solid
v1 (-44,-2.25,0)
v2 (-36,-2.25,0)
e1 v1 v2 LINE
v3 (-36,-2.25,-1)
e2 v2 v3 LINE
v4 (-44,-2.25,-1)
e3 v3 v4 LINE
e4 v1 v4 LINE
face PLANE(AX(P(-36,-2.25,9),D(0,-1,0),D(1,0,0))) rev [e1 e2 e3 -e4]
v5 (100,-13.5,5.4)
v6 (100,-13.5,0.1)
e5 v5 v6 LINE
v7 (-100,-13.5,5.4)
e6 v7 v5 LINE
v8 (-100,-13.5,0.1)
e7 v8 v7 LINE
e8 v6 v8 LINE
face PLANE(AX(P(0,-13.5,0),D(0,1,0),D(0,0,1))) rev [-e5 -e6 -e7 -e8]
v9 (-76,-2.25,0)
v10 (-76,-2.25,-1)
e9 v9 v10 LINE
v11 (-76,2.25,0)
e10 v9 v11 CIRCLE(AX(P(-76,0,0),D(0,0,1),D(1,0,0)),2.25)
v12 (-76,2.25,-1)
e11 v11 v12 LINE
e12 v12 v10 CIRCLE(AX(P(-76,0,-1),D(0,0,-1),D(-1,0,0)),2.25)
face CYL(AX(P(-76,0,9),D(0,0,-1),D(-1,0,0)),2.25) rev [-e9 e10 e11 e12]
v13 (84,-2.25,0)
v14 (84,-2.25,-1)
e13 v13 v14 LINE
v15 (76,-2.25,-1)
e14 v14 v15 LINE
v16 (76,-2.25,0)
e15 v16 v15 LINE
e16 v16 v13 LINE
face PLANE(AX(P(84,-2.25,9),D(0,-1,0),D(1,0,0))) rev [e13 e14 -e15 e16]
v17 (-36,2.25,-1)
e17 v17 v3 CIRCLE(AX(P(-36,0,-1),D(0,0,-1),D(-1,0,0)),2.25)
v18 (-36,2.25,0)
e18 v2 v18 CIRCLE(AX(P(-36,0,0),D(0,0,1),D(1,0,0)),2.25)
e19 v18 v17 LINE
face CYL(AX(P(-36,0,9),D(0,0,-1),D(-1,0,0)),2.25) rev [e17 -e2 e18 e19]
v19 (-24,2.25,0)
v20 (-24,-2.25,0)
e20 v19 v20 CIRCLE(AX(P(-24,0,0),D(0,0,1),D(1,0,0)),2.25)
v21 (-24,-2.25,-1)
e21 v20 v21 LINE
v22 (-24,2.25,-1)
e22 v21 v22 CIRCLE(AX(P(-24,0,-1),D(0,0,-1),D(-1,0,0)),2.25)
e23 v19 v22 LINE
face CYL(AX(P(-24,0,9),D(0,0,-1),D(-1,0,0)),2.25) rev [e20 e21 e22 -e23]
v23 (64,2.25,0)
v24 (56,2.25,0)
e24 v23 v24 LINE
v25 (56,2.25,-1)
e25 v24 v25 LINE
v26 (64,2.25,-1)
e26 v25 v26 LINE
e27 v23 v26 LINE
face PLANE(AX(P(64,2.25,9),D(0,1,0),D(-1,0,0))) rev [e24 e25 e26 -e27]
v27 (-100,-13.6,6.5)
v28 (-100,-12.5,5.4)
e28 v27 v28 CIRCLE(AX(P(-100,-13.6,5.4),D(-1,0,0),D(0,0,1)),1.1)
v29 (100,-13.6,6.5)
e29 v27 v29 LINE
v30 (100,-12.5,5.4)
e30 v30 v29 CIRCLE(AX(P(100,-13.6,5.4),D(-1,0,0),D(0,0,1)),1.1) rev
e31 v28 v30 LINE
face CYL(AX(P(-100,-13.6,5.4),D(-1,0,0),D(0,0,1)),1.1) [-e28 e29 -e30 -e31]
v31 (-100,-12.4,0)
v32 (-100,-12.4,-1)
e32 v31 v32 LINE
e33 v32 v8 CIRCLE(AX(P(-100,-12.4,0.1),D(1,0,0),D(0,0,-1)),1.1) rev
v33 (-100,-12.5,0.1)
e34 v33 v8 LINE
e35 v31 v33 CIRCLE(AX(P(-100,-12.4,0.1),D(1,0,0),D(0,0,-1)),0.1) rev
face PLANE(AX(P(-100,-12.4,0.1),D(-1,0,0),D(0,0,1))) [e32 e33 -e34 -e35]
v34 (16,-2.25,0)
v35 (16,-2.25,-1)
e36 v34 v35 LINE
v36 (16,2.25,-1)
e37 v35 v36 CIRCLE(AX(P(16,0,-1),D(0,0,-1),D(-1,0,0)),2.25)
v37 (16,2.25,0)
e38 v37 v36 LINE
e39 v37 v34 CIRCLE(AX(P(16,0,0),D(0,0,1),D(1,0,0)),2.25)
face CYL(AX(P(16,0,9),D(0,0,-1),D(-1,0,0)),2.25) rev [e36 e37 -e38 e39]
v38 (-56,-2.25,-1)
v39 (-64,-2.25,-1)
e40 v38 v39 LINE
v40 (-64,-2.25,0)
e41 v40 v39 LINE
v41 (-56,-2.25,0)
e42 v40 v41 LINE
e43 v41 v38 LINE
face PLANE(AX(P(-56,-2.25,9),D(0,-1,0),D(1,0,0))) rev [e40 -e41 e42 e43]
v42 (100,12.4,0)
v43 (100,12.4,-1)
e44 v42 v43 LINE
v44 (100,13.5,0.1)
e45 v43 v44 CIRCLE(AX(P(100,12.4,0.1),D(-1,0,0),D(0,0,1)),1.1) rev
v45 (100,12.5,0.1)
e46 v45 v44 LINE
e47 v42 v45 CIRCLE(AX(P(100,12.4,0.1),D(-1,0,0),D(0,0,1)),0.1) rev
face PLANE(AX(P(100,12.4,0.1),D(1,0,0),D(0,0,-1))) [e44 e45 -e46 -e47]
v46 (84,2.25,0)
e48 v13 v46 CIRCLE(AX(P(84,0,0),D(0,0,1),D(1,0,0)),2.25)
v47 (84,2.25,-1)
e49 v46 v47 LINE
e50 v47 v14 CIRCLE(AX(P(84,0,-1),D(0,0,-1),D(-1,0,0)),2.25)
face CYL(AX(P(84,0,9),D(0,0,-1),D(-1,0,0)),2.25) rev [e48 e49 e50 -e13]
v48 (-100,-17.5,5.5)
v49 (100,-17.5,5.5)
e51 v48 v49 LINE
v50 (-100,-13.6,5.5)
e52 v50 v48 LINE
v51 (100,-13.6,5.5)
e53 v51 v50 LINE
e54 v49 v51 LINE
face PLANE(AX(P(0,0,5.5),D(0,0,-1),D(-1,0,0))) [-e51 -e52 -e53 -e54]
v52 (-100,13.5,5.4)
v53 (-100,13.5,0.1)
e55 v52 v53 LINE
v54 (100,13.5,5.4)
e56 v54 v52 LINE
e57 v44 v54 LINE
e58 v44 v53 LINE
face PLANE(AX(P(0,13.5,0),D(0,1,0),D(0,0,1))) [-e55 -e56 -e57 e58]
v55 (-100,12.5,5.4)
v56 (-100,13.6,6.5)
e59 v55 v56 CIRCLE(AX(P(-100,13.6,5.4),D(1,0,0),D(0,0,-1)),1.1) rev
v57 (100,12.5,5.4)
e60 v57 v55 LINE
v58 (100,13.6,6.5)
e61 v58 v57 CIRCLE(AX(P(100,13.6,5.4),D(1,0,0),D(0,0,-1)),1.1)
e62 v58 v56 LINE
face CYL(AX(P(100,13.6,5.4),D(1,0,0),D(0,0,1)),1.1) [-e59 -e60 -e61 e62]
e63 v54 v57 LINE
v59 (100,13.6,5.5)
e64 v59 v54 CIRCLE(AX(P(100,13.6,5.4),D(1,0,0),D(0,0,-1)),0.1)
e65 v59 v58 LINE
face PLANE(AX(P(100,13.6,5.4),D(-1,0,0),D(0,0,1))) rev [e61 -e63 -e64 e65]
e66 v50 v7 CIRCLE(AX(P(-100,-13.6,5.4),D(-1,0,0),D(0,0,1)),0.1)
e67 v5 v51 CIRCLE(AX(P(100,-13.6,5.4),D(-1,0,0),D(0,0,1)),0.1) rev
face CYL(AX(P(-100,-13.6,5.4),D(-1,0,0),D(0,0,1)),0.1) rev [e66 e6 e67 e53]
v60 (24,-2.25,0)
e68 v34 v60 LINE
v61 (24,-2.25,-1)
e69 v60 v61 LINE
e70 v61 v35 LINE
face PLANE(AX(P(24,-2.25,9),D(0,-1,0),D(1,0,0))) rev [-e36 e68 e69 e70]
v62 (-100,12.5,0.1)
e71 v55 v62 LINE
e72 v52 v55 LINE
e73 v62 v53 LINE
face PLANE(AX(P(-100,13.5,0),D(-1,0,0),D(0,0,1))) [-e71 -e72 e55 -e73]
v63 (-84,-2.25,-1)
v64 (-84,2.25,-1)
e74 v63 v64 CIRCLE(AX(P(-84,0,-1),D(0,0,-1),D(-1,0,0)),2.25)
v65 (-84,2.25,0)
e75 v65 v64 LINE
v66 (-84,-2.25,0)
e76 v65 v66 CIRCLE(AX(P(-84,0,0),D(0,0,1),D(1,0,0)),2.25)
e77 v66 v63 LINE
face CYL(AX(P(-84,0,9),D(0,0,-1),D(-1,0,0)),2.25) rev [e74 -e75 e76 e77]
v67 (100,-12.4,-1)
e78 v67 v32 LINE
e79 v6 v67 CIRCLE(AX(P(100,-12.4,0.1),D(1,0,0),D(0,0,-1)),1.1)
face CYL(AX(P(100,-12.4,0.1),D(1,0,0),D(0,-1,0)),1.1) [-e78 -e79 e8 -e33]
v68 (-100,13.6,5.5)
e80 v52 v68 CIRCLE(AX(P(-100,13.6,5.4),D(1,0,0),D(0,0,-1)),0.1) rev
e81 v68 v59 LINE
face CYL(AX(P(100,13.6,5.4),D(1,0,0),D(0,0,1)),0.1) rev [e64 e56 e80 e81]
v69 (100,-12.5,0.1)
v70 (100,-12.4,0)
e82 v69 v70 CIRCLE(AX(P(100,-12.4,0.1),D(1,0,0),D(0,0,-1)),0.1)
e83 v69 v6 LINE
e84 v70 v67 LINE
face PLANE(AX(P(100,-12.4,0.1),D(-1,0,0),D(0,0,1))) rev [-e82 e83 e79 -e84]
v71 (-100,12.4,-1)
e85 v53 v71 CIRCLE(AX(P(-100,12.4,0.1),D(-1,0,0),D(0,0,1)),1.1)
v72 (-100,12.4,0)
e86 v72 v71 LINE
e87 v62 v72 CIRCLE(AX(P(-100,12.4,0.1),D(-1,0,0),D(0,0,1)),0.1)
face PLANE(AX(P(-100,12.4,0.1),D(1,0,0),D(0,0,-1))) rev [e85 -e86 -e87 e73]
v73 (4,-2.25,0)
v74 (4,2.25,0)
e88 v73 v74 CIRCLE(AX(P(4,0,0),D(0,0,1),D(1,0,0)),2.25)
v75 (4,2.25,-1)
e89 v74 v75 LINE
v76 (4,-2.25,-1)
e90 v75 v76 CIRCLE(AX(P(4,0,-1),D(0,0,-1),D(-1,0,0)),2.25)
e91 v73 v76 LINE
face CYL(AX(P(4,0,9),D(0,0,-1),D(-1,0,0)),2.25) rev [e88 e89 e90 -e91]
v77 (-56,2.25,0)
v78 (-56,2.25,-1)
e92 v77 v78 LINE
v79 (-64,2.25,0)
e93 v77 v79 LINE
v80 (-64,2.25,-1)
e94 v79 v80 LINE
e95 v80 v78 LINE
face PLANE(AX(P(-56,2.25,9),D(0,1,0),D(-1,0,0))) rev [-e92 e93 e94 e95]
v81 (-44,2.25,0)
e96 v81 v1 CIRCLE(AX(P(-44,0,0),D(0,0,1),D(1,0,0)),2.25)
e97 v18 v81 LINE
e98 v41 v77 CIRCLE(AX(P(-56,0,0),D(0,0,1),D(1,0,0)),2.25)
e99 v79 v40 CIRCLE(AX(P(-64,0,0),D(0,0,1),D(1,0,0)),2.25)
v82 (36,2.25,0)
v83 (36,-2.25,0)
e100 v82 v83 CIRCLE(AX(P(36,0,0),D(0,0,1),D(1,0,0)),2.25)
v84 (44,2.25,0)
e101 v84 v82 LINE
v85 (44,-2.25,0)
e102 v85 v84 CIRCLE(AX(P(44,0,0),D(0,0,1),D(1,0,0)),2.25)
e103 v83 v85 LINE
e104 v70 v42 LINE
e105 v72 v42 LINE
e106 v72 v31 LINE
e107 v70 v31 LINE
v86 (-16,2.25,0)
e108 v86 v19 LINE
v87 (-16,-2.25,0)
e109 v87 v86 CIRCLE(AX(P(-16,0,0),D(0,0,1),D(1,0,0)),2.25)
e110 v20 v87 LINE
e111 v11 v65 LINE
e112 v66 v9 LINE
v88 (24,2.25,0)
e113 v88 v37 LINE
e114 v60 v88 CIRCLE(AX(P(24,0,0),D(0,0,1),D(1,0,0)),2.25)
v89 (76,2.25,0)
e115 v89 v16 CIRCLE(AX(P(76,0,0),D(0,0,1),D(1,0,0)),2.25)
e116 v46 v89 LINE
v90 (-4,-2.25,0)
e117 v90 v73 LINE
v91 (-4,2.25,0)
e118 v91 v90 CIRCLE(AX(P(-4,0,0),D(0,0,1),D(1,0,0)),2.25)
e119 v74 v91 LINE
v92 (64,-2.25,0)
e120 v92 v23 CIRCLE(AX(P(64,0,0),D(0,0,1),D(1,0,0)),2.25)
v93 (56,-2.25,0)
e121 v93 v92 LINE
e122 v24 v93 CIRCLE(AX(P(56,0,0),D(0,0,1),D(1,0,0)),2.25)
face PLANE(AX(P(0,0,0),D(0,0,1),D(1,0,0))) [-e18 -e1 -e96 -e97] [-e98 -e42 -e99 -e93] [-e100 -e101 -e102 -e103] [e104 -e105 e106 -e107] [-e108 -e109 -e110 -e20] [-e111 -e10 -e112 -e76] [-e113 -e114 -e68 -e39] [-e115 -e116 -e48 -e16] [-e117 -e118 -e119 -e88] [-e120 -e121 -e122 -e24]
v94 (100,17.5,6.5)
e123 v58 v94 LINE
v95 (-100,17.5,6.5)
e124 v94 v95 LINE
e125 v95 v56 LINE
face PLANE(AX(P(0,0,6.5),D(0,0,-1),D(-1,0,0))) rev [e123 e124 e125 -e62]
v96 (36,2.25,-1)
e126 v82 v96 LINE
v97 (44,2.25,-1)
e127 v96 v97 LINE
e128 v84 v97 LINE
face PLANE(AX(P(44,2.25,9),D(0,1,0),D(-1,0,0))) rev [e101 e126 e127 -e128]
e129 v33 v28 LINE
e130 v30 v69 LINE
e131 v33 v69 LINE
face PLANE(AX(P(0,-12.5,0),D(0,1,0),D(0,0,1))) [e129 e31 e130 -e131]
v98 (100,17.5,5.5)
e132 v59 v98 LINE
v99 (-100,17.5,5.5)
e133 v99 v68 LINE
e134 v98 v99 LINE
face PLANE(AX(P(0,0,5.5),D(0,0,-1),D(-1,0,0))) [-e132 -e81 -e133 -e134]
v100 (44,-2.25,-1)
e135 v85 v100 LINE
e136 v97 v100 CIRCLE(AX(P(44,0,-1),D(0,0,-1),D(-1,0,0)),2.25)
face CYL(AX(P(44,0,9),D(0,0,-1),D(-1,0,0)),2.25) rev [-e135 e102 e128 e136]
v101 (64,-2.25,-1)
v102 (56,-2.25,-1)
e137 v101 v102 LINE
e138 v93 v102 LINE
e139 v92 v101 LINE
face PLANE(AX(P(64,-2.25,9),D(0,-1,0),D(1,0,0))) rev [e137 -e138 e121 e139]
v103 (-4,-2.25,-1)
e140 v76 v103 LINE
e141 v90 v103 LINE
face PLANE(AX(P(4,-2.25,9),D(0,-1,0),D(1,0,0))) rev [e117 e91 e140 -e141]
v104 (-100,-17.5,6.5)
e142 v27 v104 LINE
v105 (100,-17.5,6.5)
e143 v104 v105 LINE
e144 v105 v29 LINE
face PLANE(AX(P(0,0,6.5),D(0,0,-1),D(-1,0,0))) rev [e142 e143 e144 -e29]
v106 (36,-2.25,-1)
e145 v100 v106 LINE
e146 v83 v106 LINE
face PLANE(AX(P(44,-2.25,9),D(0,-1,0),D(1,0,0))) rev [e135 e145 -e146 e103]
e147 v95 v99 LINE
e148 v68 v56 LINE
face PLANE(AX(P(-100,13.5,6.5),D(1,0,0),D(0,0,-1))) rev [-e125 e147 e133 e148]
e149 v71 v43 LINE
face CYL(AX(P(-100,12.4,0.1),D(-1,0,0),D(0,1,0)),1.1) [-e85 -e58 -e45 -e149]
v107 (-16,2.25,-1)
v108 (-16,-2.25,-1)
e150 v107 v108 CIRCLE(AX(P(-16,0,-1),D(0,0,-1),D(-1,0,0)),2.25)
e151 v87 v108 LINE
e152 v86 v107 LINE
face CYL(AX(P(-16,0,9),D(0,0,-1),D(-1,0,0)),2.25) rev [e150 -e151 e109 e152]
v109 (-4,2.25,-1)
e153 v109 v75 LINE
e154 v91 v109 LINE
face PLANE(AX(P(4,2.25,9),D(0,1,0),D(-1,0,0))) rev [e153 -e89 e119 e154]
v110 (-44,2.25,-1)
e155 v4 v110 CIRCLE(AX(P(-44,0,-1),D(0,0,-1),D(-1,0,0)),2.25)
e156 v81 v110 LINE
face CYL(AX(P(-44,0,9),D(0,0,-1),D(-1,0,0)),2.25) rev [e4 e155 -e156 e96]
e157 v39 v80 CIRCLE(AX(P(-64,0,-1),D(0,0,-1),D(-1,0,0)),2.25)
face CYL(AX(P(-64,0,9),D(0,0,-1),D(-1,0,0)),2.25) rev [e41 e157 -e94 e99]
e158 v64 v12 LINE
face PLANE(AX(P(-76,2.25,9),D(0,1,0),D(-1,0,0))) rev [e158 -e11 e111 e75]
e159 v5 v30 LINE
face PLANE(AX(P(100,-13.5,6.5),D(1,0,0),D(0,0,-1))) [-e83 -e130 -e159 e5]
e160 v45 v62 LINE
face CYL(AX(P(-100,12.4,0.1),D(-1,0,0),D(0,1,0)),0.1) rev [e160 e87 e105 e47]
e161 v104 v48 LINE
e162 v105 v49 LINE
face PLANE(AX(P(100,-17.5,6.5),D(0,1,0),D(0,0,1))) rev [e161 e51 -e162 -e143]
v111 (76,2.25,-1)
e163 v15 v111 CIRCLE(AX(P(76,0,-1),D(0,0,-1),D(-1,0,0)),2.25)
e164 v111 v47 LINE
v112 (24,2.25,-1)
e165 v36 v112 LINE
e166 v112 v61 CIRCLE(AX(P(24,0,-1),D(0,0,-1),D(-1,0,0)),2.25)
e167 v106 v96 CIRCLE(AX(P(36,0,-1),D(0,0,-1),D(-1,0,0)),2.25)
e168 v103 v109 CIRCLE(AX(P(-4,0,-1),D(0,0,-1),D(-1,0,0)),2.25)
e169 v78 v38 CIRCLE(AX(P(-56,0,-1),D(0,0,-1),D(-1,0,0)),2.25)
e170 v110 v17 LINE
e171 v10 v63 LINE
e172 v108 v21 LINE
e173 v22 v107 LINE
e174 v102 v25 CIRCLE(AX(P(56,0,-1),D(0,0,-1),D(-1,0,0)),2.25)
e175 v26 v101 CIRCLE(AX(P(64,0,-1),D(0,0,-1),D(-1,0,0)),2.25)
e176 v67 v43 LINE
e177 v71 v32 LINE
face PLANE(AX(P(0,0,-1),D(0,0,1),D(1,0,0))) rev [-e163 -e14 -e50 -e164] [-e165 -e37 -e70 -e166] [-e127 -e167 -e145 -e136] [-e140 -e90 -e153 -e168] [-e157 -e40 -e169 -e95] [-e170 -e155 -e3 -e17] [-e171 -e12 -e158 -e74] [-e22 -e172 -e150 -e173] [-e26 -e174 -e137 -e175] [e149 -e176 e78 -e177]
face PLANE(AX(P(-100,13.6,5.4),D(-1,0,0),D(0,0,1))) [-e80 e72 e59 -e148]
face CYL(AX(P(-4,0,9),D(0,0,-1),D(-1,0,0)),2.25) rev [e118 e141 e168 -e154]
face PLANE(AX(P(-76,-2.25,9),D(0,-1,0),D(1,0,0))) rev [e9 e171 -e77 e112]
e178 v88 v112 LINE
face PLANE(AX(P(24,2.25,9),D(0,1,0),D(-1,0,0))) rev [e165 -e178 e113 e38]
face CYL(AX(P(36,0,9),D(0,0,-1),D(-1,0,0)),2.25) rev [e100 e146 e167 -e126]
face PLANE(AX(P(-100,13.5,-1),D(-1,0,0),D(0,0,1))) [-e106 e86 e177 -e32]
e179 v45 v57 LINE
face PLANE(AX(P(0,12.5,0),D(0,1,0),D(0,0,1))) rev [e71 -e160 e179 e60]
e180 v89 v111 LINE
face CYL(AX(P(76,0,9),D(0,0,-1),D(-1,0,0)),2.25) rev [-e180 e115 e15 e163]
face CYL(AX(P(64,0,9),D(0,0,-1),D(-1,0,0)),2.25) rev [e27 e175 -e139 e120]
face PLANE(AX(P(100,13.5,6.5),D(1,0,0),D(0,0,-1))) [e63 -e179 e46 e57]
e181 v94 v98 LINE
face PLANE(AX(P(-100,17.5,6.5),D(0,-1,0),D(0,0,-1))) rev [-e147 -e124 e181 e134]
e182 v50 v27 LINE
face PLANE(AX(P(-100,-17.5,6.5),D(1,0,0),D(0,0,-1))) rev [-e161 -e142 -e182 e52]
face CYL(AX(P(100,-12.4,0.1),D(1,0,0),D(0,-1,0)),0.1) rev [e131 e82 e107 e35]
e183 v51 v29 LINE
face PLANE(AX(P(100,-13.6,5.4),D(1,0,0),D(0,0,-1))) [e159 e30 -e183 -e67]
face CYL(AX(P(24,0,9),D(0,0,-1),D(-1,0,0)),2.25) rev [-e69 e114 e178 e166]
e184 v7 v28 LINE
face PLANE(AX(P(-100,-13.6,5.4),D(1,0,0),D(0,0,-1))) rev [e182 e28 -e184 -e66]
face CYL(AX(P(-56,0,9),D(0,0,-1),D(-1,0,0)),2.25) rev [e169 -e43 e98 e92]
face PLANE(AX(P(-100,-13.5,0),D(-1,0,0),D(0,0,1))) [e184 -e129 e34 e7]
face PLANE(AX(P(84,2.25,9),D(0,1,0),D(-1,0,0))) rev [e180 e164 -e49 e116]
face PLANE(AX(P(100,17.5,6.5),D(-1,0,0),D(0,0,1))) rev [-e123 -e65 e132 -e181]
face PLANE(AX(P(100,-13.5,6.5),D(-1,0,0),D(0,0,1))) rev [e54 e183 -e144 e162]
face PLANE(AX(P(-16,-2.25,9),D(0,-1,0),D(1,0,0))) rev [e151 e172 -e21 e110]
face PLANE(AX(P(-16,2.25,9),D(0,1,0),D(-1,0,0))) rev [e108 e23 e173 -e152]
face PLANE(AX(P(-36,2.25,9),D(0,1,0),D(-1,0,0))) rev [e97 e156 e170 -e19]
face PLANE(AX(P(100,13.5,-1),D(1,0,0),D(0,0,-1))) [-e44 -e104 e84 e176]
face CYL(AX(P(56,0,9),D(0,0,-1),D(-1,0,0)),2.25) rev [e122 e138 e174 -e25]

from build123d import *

# Parameters (mm, degrees)
SKETCH_1_W                         = 200
SKETCH_1_H                         = 27
SM_BASE_FLANGE_1_DEPTH             = 1
SM_EDGE_FLANGE_1_STRIP_W           = 4.2
SM_EDGE_FLANGE_1_STRIP_H           = 1
SM_EDGE_FLANGE_1_STRIP_CUT_DEPTH   = 200
SM_EDGE_FLANGE_1_STRIP_2_W         = 4.2
SM_EDGE_FLANGE_1_STRIP_2_H         = 1
SM_EDGE_FLANGE_1_STRIP_CUT_2_DEPTH = 200
SM_EDGE_FLANGE_1_DEPTH             = 200
SM_EDGE_FLANGE_1_BEND_DEPTH        = 200
SM_EDGE_FLANGE_2_STRIP_W           = 4.2
SM_EDGE_FLANGE_2_STRIP_H           = 1
SM_EDGE_FLANGE_2_STRIP_CUT_DEPTH   = 200
SM_EDGE_FLANGE_2_STRIP_2_W         = 4.2
SM_EDGE_FLANGE_2_STRIP_2_H         = 1
SM_EDGE_FLANGE_2_STRIP_CUT_2_DEPTH = 200
SM_EDGE_FLANGE_2_DEPTH             = 200
SM_EDGE_FLANGE_2_BEND_DEPTH        = 200
CUT_EXTRUDE_1_DEPTH                = 10
PATTERN_LINEAR_1_COUNT             = 5
PATTERN_LINEAR_1_PITCH             = 20
PATTERN_LINEAR_1_COL_COUNT         = 5
PATTERN_LINEAR_1_COL_PITCH         = 20


# Sheet-metal steps are written as plain solids
with BuildPart() as part:
    # Sketch 1 → 基体-法兰1 (new body)
    with BuildSketch(Plane.XY):
        Rectangle(SKETCH_1_W, SKETCH_1_H)
    extrude(amount=-SM_BASE_FLANGE_1_DEPTH)

    # 边线-法兰1 strip (across the edge) → 边线-法兰1 strip cut (cut)
    with BuildSketch(Plane(origin=(100, 13.5, 0), x_dir=(0, -1, 0), z_dir=(-1, 0, 0))):
        with Locations((-1, -0.5)):
            Rectangle(SM_EDGE_FLANGE_1_STRIP_W, SM_EDGE_FLANGE_1_STRIP_H)
    extrude(amount=SM_EDGE_FLANGE_1_STRIP_CUT_DEPTH, mode=Mode.SUBTRACT)

    # 边线-法兰1 strip 2 (across the edge) → 边线-法兰1 strip cut 2 (cut)
    with BuildSketch(Plane(origin=(-100, -13.5, 0), x_dir=(0, 1, 0), z_dir=(1, 0, 0))):
        with Locations((-1, -0.5)):
            Rectangle(SM_EDGE_FLANGE_1_STRIP_2_W, SM_EDGE_FLANGE_1_STRIP_2_H)
    extrude(amount=SM_EDGE_FLANGE_1_STRIP_CUT_2_DEPTH, mode=Mode.SUBTRACT)

    # 边线-法兰1 section (across the edge) → 边线-法兰1 (add)
    with BuildSketch(Plane(origin=(100, 13.5, 0), x_dir=(0, -1, 0), z_dir=(-1, 0, 0))):
        with BuildLine():
            Line((0, 0.1), (0, 6.5))
            Line((0, 6.5), (1, 6.5))
            Line((1, 6.5), (1, 0.1))
            ThreePointArc((1, 0.1), (1.029289322, 0.029289322), (1.1, 0))
            Line((1.1, 0), (1.1, -1))
            ThreePointArc((1.1, -1), (0.322182541, -0.677817459), (0, 0.1))
        make_face()
    extrude(amount=SM_EDGE_FLANGE_1_DEPTH)

    # 边线-法兰1 section 2 (across the edge) → 边线-法兰1 bend (add)
    with BuildSketch(Plane(origin=(-100, -13.5, 0), x_dir=(0, 1, 0), z_dir=(1, 0, 0))):
        with BuildLine():
            Line((0, 0.1), (0, 6.5))
            Line((0, 6.5), (1, 6.5))
            Line((1, 6.5), (1, 0.1))
            ThreePointArc((1, 0.1), (1.029289322, 0.029289322), (1.1, 0))
            Line((1.1, 0), (1.1, -1))
            ThreePointArc((1.1, -1), (0.322182541, -0.677817459), (0, 0.1))
        make_face()
    extrude(amount=SM_EDGE_FLANGE_1_BEND_DEPTH)

    # 边线-法兰2 strip (across the edge) → 边线-法兰2 strip cut (cut)
    with BuildSketch(Plane(origin=(-100, 13.5, 6.5), x_dir=(0, 0, -1), z_dir=(1, 0, 0))):
        with Locations((-1, -0.5)):
            Rectangle(SM_EDGE_FLANGE_2_STRIP_W, SM_EDGE_FLANGE_2_STRIP_H)
    extrude(amount=SM_EDGE_FLANGE_2_STRIP_CUT_DEPTH, mode=Mode.SUBTRACT)

    # 边线-法兰2 strip 2 (across the edge) → 边线-法兰2 strip cut 2 (cut)
    with BuildSketch(Plane(origin=(100, -13.5, 6.5), x_dir=(0, 0, -1), z_dir=(-1, 0, 0))):
        with Locations((-1, -0.5)):
            Rectangle(SM_EDGE_FLANGE_2_STRIP_2_W, SM_EDGE_FLANGE_2_STRIP_2_H)
    extrude(amount=SM_EDGE_FLANGE_2_STRIP_CUT_2_DEPTH, mode=Mode.SUBTRACT)

    # 边线-法兰2 section (across the edge) → 边线-法兰2 (add)
    with BuildSketch(Plane(origin=(-100, 13.5, 6.5), x_dir=(0, 0, -1), z_dir=(1, 0, 0))):
        with BuildLine():
            Line((0, 0.1), (0, 4))
            Line((0, 4), (1, 4))
            Line((1, 4), (1, 0.1))
            ThreePointArc((1, 0.1), (1.029289322, 0.029289322), (1.1, 0))
            Line((1.1, 0), (1.1, -1))
            ThreePointArc((1.1, -1), (0.322182541, -0.677817459), (0, 0.1))
        make_face()
    extrude(amount=SM_EDGE_FLANGE_2_DEPTH)

    # 边线-法兰2 section 2 (across the edge) → 边线-法兰2 bend (add)
    with BuildSketch(Plane(origin=(100, -13.5, 6.5), x_dir=(0, 0, -1), z_dir=(-1, 0, 0))):
        with BuildLine():
            Line((0, 0.1), (0, 4))
            Line((0, 4), (1, 4))
            Line((1, 4), (1, 0.1))
            ThreePointArc((1, 0.1), (1.029289322, 0.029289322), (1.1, 0))
            Line((1.1, 0), (1.1, -1))
            ThreePointArc((1.1, -1), (0.322182541, -0.677817459), (0, 0.1))
        make_face()
    extrude(amount=SM_EDGE_FLANGE_2_BEND_DEPTH)

    # 草图18 → 切除-拉伸1 (cut)
    with BuildSketch(Plane(origin=(0, 0, -1), x_dir=(-1, 0, 0), z_dir=(0, 0, -1))):
        with BuildLine():
            Line((-4, 2.25), (4, 2.25))
            ThreePointArc((4, 2.25), (6.25, 0), (4, -2.25))
            Line((4, -2.25), (-4, -2.25))
            ThreePointArc((-4, -2.25), (-6.25, 0), (-4, 2.25))
        make_face()
    cut_extrude_1 = extrude(amount=-CUT_EXTRUDE_1_DEPTH, mode=Mode.SUBTRACT)

    # 阵列(线性)1: 切除-拉伸1 ×5
    with Locations(*[(i * PATTERN_LINEAR_1_PITCH, 0, 0) for i in range(1, PATTERN_LINEAR_1_COUNT)]):
        add(cut_extrude_1, mode=Mode.SUBTRACT)

    # 阵列(线性)1 col: 切除-拉伸1 ×5
    with Locations(*[(-i * PATTERN_LINEAR_1_COL_PITCH, 0, 0) for i in range(1, PATTERN_LINEAR_1_COL_COUNT)]):
        add(cut_extrude_1, mode=Mode.SUBTRACT)


solid = part.part
